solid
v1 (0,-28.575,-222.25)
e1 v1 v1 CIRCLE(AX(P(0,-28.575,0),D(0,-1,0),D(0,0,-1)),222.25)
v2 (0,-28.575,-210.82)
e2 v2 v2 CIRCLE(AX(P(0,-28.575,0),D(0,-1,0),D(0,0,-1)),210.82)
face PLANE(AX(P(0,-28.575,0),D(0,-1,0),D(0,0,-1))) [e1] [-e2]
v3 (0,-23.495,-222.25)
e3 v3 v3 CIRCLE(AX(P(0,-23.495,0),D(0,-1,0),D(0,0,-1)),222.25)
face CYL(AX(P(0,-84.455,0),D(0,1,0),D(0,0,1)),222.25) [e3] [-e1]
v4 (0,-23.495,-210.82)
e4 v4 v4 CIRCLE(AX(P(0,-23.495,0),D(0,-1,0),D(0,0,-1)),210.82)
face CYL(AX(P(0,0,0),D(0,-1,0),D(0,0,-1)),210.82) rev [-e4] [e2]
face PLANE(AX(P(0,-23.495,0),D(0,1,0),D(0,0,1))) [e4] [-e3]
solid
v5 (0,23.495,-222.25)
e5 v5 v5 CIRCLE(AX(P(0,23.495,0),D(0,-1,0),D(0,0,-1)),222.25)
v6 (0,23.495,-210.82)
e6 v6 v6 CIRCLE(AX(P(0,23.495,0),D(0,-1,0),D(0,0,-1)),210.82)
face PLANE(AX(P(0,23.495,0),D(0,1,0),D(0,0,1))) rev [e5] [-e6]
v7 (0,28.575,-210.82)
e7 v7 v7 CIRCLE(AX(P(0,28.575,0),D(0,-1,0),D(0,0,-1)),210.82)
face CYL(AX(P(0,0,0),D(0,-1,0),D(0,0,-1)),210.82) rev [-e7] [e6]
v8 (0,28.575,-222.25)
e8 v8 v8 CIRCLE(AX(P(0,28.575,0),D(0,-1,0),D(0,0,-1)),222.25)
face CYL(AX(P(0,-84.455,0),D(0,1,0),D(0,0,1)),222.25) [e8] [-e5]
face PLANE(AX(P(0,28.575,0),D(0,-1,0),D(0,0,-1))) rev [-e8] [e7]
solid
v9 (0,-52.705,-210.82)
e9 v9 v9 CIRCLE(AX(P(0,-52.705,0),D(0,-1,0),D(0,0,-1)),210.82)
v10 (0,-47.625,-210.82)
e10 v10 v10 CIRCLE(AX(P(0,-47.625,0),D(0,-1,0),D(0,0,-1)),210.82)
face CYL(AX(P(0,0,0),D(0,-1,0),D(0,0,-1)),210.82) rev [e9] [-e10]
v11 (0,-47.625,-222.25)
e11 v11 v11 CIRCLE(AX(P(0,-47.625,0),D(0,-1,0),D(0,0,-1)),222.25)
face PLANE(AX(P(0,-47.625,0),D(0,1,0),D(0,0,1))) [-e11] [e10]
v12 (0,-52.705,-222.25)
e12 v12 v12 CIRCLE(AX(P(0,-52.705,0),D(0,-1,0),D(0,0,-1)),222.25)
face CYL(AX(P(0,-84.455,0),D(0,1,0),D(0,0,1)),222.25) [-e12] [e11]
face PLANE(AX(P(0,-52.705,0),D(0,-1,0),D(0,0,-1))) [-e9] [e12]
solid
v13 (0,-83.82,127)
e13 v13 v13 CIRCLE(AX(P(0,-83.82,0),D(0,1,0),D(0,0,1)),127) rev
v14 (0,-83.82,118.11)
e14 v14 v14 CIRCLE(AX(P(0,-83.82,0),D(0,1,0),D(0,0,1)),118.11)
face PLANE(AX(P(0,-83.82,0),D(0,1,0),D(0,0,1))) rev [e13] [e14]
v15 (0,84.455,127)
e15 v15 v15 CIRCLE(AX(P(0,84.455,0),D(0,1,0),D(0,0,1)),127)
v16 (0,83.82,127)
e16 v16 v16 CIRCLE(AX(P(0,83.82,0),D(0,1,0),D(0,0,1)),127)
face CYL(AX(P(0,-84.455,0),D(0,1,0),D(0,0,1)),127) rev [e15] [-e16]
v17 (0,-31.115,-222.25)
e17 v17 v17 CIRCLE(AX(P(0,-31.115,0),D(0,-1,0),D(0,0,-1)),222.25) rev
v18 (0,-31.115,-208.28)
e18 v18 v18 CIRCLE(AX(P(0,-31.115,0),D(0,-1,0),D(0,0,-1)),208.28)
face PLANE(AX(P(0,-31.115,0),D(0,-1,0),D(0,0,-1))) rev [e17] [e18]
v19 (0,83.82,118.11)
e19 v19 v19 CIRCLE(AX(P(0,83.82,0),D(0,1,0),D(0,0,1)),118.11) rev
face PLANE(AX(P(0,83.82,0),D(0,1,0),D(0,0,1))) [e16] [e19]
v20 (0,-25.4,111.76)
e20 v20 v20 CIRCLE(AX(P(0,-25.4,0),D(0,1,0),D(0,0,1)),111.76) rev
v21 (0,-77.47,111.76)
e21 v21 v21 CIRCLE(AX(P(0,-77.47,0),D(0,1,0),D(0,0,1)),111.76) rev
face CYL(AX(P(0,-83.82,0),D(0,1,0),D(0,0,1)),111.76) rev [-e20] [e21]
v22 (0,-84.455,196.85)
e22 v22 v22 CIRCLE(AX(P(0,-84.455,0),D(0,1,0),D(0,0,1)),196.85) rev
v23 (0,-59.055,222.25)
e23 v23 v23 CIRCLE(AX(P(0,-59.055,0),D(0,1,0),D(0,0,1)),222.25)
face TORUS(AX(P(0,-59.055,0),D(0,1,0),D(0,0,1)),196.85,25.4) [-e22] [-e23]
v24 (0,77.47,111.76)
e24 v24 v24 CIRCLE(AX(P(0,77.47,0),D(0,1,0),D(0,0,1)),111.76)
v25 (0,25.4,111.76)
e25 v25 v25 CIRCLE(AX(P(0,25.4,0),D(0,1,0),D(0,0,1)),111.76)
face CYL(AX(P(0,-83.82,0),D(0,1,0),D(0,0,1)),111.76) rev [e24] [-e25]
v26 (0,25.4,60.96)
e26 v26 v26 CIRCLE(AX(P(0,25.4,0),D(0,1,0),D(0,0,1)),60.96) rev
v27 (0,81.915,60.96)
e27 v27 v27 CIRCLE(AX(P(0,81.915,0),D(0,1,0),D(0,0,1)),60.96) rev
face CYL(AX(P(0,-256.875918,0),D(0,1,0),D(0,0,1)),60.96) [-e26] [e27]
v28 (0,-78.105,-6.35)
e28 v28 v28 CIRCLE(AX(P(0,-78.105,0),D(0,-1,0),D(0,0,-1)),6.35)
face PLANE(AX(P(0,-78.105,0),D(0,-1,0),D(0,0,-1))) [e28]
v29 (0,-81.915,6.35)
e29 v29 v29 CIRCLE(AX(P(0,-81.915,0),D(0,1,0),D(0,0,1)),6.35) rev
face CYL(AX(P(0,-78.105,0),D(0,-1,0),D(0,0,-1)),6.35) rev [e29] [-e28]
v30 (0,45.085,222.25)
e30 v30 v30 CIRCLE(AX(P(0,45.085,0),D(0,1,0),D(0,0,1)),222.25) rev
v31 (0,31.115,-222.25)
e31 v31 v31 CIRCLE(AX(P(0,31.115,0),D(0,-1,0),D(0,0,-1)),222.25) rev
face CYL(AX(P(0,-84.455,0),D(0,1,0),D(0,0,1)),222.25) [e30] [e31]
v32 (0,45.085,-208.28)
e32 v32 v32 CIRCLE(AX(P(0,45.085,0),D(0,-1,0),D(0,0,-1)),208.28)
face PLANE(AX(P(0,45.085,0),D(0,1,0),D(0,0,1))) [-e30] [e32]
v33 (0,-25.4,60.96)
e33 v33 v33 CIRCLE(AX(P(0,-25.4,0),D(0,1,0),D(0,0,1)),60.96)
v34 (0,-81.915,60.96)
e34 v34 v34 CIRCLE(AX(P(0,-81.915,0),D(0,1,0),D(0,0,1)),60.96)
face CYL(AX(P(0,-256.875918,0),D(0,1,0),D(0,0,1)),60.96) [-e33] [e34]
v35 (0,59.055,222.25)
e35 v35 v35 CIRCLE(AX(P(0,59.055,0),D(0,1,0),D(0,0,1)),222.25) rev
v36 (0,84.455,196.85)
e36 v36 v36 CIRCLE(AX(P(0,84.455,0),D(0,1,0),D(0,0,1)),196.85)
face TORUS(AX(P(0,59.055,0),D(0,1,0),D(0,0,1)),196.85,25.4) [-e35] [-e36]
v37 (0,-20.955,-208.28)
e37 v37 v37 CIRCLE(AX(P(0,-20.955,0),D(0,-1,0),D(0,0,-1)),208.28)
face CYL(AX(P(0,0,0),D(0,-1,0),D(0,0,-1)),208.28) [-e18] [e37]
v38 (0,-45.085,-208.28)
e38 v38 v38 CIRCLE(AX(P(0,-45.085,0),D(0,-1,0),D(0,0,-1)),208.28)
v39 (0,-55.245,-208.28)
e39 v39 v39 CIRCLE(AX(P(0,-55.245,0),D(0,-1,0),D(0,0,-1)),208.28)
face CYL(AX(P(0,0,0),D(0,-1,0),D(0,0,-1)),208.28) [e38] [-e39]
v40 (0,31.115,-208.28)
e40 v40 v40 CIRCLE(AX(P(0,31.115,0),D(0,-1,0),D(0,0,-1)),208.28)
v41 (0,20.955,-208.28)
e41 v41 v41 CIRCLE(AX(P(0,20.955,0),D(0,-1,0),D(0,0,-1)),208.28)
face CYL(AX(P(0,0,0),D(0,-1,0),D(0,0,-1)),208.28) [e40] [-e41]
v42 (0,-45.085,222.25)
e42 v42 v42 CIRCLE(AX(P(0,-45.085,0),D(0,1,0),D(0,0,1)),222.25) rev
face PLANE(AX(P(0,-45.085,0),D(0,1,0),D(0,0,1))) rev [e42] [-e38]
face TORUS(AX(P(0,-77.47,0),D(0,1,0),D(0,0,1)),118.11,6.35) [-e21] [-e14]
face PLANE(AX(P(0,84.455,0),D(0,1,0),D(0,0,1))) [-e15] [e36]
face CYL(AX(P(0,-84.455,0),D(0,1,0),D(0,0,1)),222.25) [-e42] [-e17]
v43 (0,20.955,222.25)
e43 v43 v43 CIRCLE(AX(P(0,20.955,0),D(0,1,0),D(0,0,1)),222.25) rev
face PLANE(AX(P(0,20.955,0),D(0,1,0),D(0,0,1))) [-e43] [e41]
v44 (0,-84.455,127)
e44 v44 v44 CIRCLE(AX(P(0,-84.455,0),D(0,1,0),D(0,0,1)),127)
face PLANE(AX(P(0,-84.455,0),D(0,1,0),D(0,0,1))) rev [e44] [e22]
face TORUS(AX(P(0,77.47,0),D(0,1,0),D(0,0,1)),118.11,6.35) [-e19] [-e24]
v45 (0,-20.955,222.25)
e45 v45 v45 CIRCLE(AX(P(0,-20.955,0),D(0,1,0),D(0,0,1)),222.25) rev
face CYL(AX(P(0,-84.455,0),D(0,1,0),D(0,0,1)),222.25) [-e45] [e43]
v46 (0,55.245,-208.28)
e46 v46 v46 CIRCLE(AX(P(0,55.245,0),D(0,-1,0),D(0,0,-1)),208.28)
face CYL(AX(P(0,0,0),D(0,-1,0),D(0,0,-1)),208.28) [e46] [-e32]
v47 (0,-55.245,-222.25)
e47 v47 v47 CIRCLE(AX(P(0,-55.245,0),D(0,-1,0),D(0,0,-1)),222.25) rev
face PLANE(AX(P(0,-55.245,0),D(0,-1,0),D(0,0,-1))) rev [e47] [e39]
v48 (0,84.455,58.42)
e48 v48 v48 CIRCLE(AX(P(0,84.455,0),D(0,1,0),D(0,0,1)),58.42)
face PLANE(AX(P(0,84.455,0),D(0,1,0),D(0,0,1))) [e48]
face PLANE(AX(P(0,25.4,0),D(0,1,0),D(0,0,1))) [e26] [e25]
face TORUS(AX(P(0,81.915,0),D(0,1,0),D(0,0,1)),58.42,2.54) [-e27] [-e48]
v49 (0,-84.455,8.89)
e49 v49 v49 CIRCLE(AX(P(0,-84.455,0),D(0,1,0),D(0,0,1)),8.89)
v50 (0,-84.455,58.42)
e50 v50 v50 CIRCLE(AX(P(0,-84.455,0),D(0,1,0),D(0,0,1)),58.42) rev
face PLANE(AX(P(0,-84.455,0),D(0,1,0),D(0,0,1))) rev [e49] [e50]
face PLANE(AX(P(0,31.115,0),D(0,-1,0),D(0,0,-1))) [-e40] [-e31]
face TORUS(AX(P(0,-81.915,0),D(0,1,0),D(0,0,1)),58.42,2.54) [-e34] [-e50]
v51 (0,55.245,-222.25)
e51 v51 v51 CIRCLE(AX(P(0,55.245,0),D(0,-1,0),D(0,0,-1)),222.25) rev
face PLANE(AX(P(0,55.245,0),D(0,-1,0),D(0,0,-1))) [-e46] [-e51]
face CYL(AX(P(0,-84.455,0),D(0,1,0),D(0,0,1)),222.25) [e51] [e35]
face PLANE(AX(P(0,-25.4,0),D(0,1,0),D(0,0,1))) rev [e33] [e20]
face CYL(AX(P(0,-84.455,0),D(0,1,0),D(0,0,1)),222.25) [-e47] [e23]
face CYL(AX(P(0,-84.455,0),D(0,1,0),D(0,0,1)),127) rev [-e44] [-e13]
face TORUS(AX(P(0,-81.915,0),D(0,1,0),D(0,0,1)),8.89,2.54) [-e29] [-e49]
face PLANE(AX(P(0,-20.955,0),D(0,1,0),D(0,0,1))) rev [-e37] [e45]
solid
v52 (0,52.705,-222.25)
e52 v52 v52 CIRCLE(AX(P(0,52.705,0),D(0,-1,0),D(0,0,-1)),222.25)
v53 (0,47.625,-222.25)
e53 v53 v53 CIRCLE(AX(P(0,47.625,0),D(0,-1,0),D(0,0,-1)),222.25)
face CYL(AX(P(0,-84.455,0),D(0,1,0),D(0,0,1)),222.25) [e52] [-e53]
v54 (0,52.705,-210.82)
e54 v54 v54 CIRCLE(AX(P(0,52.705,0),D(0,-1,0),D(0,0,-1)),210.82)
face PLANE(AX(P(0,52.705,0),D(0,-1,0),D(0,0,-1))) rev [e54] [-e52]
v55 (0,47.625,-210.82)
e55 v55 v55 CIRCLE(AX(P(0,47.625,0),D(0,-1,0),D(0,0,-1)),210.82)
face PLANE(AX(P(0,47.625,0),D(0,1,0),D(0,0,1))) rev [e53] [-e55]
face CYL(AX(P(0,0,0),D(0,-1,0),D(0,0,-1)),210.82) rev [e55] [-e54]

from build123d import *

# Parameters (mm, degrees)
BOSS_EXTRUDE1_DEPTH              = 84.455
BOSS_EXTRUDE1_DEPTH_BACK         = 84.455
SKETCH1_R                        = 222.25
SKETCH1_R_2                      = 127
CUT_REVOLVE_THIN1_START          = -55.245
CUT_REVOLVE_THIN1_OUTLINE_R      = 222.25
CUT_REVOLVE_THIN1_OUTLINE_R_2    = 208.28
CUT_REVOLVE_THIN1_DEPTH          = 2.54
CUT_REVOLVE_THIN1_START_2        = -47.625
CUT_REVOLVE_THIN1_2_OUTLINE_R    = 222.25
CUT_REVOLVE_THIN1_2_OUTLINE_R_2  = 208.28
CUT_REVOLVE_THIN1_2_DEPTH        = 2.54
CUT_REVOLVE_THIN1_START_3        = -31.115
CUT_REVOLVE_THIN1_3_OUTLINE_R    = 222.25
CUT_REVOLVE_THIN1_3_OUTLINE_R_2  = 208.28
CUT_REVOLVE_THIN1_3_DEPTH        = 2.54
CUT_REVOLVE_THIN1_START_4        = -23.495
CUT_REVOLVE_THIN1_4_OUTLINE_R    = 222.25
CUT_REVOLVE_THIN1_4_OUTLINE_R_2  = 208.28
CUT_REVOLVE_THIN1_4_DEPTH        = 2.54
CUT_REVOLVE_THIN1_START_5        = 20.955
CUT_REVOLVE_THIN1_5_OUTLINE_R    = 222.25
CUT_REVOLVE_THIN1_5_OUTLINE_R_2  = 208.28
CUT_REVOLVE_THIN1_5_DEPTH        = 2.54
CUT_REVOLVE_THIN1_START_6        = 28.575
CUT_REVOLVE_THIN1_6_OUTLINE_R    = 222.25
CUT_REVOLVE_THIN1_6_OUTLINE_R_2  = 208.28
CUT_REVOLVE_THIN1_6_DEPTH        = 2.54
CUT_REVOLVE_THIN1_START_7        = 45.085
CUT_REVOLVE_THIN1_7_OUTLINE_R    = 222.25
CUT_REVOLVE_THIN1_7_OUTLINE_R_2  = 208.28
CUT_REVOLVE_THIN1_7_DEPTH        = 2.54
CUT_REVOLVE_THIN1_START_8        = 52.705
CUT_REVOLVE_THIN1_8_OUTLINE_R    = 222.25
CUT_REVOLVE_THIN1_8_OUTLINE_R_2  = 208.28
CUT_REVOLVE_THIN1_8_DEPTH        = 2.54
CUT_REVOLVE_THIN1_START_9        = -52.705
CUT_REVOLVE_THIN1_9_OUTLINE_R    = 210.82
CUT_REVOLVE_THIN1_9_OUTLINE_R_2  = 208.28
CUT_REVOLVE_THIN1_9_DEPTH        = 5.08
CUT_REVOLVE_THIN1_START_10       = -28.575
CUT_REVOLVE_THIN1_10_OUTLINE_R   = 210.82
CUT_REVOLVE_THIN1_10_OUTLINE_R_2 = 208.28
CUT_REVOLVE_THIN1_10_DEPTH       = 5.08
CUT_REVOLVE_THIN1_START_11       = 23.495
CUT_REVOLVE_THIN1_11_OUTLINE_R   = 210.82
CUT_REVOLVE_THIN1_11_OUTLINE_R_2 = 208.28
CUT_REVOLVE_THIN1_11_DEPTH       = 5.08
CUT_REVOLVE_THIN1_START_12       = 47.625
CUT_REVOLVE_THIN1_12_OUTLINE_R   = 210.82
CUT_REVOLVE_THIN1_12_OUTLINE_R_2 = 208.28
CUT_REVOLVE_THIN1_12_DEPTH       = 5.08
FILLET1_R                        = 25.4
BOSS_EXTRUDE3_DEPTH              = 84.455
BOSS_EXTRUDE3_DEPTH_BACK         = 84.455
SKETCH4_R                        = 60.96
BOSS_EXTRUDE4_DEPTH              = 25.4
BOSS_EXTRUDE4_DEPTH_BACK         = 25.4
SKETCH4_5_R                      = 111.76
SKETCH4_5_R_2                    = 60.96
BOSS_EXTRUDE5_DEPTH              = 83.82
BOSS_EXTRUDE5_DEPTH_BACK         = 83.82
SKETCH4_6_R                      = 127
SKETCH4_6_R_2                    = 111.76
FILLET3_R                        = 6.35
FILLET4_R                        = 2.54
SKETCH6_R                        = 6.35
CUT_EXTRUDE1_DEPTH               = 6.35
FILLET5_R                        = 2.54


# Read off the part's stored shape, not the designer's step: Cut-Revolve-Thin1
with BuildPart() as part:
    # Sketch1 → Boss-Extrude1 (new, two sides: drawn at the far end of the back side and taken through both)
    with BuildSketch(Plane(origin=(0, 0, 0), x_dir=(1, 0, 0), z_dir=(0, 1, 0)).offset(-BOSS_EXTRUDE1_DEPTH_BACK)):
        with Locations(Location((0, 0, 0), (0, 0, 270))):
            Circle(SKETCH1_R)
        with Locations(Location((0, 0, 0), (0, 0, 270))):
            Circle(SKETCH1_R_2, mode=Mode.SUBTRACT)
    extrude(amount=BOSS_EXTRUDE1_DEPTH + BOSS_EXTRUDE1_DEPTH_BACK)

    # Cut-Revolve-Thin1 outline → Cut-Revolve-Thin1 (cut)
    with BuildSketch(Plane(origin=(0, 0, 0), x_dir=(1, 0, 0), z_dir=(0, 1, 0)).offset(CUT_REVOLVE_THIN1_START)):
        Circle(CUT_REVOLVE_THIN1_OUTLINE_R)
        Circle(CUT_REVOLVE_THIN1_OUTLINE_R_2, mode=Mode.SUBTRACT)
    extrude(amount=CUT_REVOLVE_THIN1_DEPTH, mode=Mode.SUBTRACT)

    # Cut-Revolve-Thin1 2 outline → Cut-Revolve-Thin1 2 (cut)
    with BuildSketch(Plane(origin=(0, 0, 0), x_dir=(1, 0, 0), z_dir=(0, 1, 0)).offset(CUT_REVOLVE_THIN1_START_2)):
        Circle(CUT_REVOLVE_THIN1_2_OUTLINE_R)
        Circle(CUT_REVOLVE_THIN1_2_OUTLINE_R_2, mode=Mode.SUBTRACT)
    extrude(amount=CUT_REVOLVE_THIN1_2_DEPTH, mode=Mode.SUBTRACT)

    # Cut-Revolve-Thin1 3 outline → Cut-Revolve-Thin1 3 (cut)
    with BuildSketch(Plane(origin=(0, 0, 0), x_dir=(1, 0, 0), z_dir=(0, 1, 0)).offset(CUT_REVOLVE_THIN1_START_3)):
        Circle(CUT_REVOLVE_THIN1_3_OUTLINE_R)
        Circle(CUT_REVOLVE_THIN1_3_OUTLINE_R_2, mode=Mode.SUBTRACT)
    extrude(amount=CUT_REVOLVE_THIN1_3_DEPTH, mode=Mode.SUBTRACT)

    # Cut-Revolve-Thin1 4 outline → Cut-Revolve-Thin1 4 (cut)
    with BuildSketch(Plane(origin=(0, 0, 0), x_dir=(1, 0, 0), z_dir=(0, 1, 0)).offset(CUT_REVOLVE_THIN1_START_4)):
        Circle(CUT_REVOLVE_THIN1_4_OUTLINE_R)
        Circle(CUT_REVOLVE_THIN1_4_OUTLINE_R_2, mode=Mode.SUBTRACT)
    extrude(amount=CUT_REVOLVE_THIN1_4_DEPTH, mode=Mode.SUBTRACT)

    # Cut-Revolve-Thin1 5 outline → Cut-Revolve-Thin1 5 (cut)
    with BuildSketch(Plane(origin=(0, 0, 0), x_dir=(1, 0, 0), z_dir=(0, 1, 0)).offset(CUT_REVOLVE_THIN1_START_5)):
        Circle(CUT_REVOLVE_THIN1_5_OUTLINE_R)
        Circle(CUT_REVOLVE_THIN1_5_OUTLINE_R_2, mode=Mode.SUBTRACT)
    extrude(amount=CUT_REVOLVE_THIN1_5_DEPTH, mode=Mode.SUBTRACT)

    # Cut-Revolve-Thin1 6 outline → Cut-Revolve-Thin1 6 (cut)
    with BuildSketch(Plane(origin=(0, 0, 0), x_dir=(1, 0, 0), z_dir=(0, 1, 0)).offset(CUT_REVOLVE_THIN1_START_6)):
        Circle(CUT_REVOLVE_THIN1_6_OUTLINE_R)
        Circle(CUT_REVOLVE_THIN1_6_OUTLINE_R_2, mode=Mode.SUBTRACT)
    extrude(amount=CUT_REVOLVE_THIN1_6_DEPTH, mode=Mode.SUBTRACT)

    # Cut-Revolve-Thin1 7 outline → Cut-Revolve-Thin1 7 (cut)
    with BuildSketch(Plane(origin=(0, 0, 0), x_dir=(1, 0, 0), z_dir=(0, 1, 0)).offset(CUT_REVOLVE_THIN1_START_7)):
        Circle(CUT_REVOLVE_THIN1_7_OUTLINE_R)
        Circle(CUT_REVOLVE_THIN1_7_OUTLINE_R_2, mode=Mode.SUBTRACT)
    extrude(amount=CUT_REVOLVE_THIN1_7_DEPTH, mode=Mode.SUBTRACT)

    # Cut-Revolve-Thin1 8 outline → Cut-Revolve-Thin1 8 (cut)
    with BuildSketch(Plane(origin=(0, 0, 0), x_dir=(1, 0, 0), z_dir=(0, 1, 0)).offset(CUT_REVOLVE_THIN1_START_8)):
        Circle(CUT_REVOLVE_THIN1_8_OUTLINE_R)
        Circle(CUT_REVOLVE_THIN1_8_OUTLINE_R_2, mode=Mode.SUBTRACT)
    extrude(amount=CUT_REVOLVE_THIN1_8_DEPTH, mode=Mode.SUBTRACT)

    # Cut-Revolve-Thin1 9 outline → Cut-Revolve-Thin1 9 (cut)
    with BuildSketch(Plane(origin=(0, 0, 0), x_dir=(1, 0, 0), z_dir=(0, 1, 0)).offset(CUT_REVOLVE_THIN1_START_9)):
        Circle(CUT_REVOLVE_THIN1_9_OUTLINE_R)
        Circle(CUT_REVOLVE_THIN1_9_OUTLINE_R_2, mode=Mode.SUBTRACT)
    extrude(amount=CUT_REVOLVE_THIN1_9_DEPTH, mode=Mode.SUBTRACT)

    # Cut-Revolve-Thin1 10 outline → Cut-Revolve-Thin1 10 (cut)
    with BuildSketch(Plane(origin=(0, 0, 0), x_dir=(1, 0, 0), z_dir=(0, 1, 0)).offset(CUT_REVOLVE_THIN1_START_10)):
        Circle(CUT_REVOLVE_THIN1_10_OUTLINE_R)
        Circle(CUT_REVOLVE_THIN1_10_OUTLINE_R_2, mode=Mode.SUBTRACT)
    extrude(amount=CUT_REVOLVE_THIN1_10_DEPTH, mode=Mode.SUBTRACT)

    # Cut-Revolve-Thin1 11 outline → Cut-Revolve-Thin1 11 (cut)
    with BuildSketch(Plane(origin=(0, 0, 0), x_dir=(1, 0, 0), z_dir=(0, 1, 0)).offset(CUT_REVOLVE_THIN1_START_11)):
        Circle(CUT_REVOLVE_THIN1_11_OUTLINE_R)
        Circle(CUT_REVOLVE_THIN1_11_OUTLINE_R_2, mode=Mode.SUBTRACT)
    extrude(amount=CUT_REVOLVE_THIN1_11_DEPTH, mode=Mode.SUBTRACT)

    # Cut-Revolve-Thin1 12 outline → Cut-Revolve-Thin1 12 (cut)
    with BuildSketch(Plane(origin=(0, 0, 0), x_dir=(1, 0, 0), z_dir=(0, 1, 0)).offset(CUT_REVOLVE_THIN1_START_12)):
        Circle(CUT_REVOLVE_THIN1_12_OUTLINE_R)
        Circle(CUT_REVOLVE_THIN1_12_OUTLINE_R_2, mode=Mode.SUBTRACT)
    extrude(amount=CUT_REVOLVE_THIN1_12_DEPTH, mode=Mode.SUBTRACT)

    # Fillet1
    fillet1_edges = [part.edges().sort_by_distance(p)[0] for p in [
        (0, -84.455, -222.25),
        (0, 84.455, -222.25),
    ]]
    fillet(fillet1_edges, radius=FILLET1_R)



with BuildPart() as body_2:
    # Sketch4 → Boss-Extrude3 (new, two sides: drawn at the far end of the back side and taken through both)
    with BuildSketch(Plane(origin=(0, 0, 0), x_dir=(1, 0, 0), z_dir=(0, 1, 0)).offset(-BOSS_EXTRUDE3_DEPTH_BACK)):
        with Locations(Location((0, 0, 0), (0, 0, 270))):
            Circle(SKETCH4_R)
    extrude(amount=BOSS_EXTRUDE3_DEPTH + BOSS_EXTRUDE3_DEPTH_BACK)

    # Sketch4<5> → Boss-Extrude4 (add, two sides: drawn at the far end of the back side and taken through both)
    with BuildSketch(Plane(origin=(0, 0, 0), x_dir=(1, 0, 0), z_dir=(0, 1, 0)).offset(-BOSS_EXTRUDE4_DEPTH_BACK)):
        with Locations(Location((0, 0, 0), (0, 0, 270))):
            Circle(SKETCH4_5_R)
        with Locations(Location((0, 0, 0), (0, 0, 270))):
            Circle(SKETCH4_5_R_2, mode=Mode.SUBTRACT)
    extrude(amount=BOSS_EXTRUDE4_DEPTH + BOSS_EXTRUDE4_DEPTH_BACK)


with BuildPart() as part_1:
    add(part.part)

    add(body_2.part)  # Boss-Extrude5 merges body 2
    # Sketch4<6> → Boss-Extrude5 (add, two sides: drawn at the far end of the back side and taken through both)
    with BuildSketch(Plane(origin=(0, 0, 0), x_dir=(1, 0, 0), z_dir=(0, 1, 0)).offset(-BOSS_EXTRUDE5_DEPTH_BACK)):
        with Locations(Location((0, 0, 0), (0, 0, 270))):
            Circle(SKETCH4_6_R)
        with Locations(Location((0, 0, 0), (0, 0, 270))):
            Circle(SKETCH4_6_R_2, mode=Mode.SUBTRACT)
    extrude(amount=BOSS_EXTRUDE5_DEPTH + BOSS_EXTRUDE5_DEPTH_BACK)

    # Fillet3
    fillet3_edges = [part_1.edges().sort_by_distance(p)[0] for p in [
        (0, 83.82, -111.76),
        (0, -83.82, -111.76),
    ]]
    fillet(fillet3_edges, radius=FILLET3_R)

    # Fillet4
    fillet4_edges = [part_1.edges().sort_by_distance(p)[0] for p in [
        (0, 84.455, -60.96),
        (0, -84.455, -60.96),
    ]]
    fillet(fillet4_edges, radius=FILLET4_R)

    # Sketch6 → Cut-Extrude1 (cut)
    with BuildSketch(Plane.XZ.offset(84.455)):
        with Locations(Location((0, 0, 0), (0, 0, 270))):
            Circle(SKETCH6_R)
    extrude(amount=-CUT_EXTRUDE1_DEPTH, mode=Mode.SUBTRACT)

    # Fillet5
    fillet5_edges = [part_1.edges().sort_by_distance(p)[0] for p in [
        (0, -84.455, 6.35),
    ]]
    fillet(fillet5_edges, radius=FILLET5_R)


solid = part_1.part
